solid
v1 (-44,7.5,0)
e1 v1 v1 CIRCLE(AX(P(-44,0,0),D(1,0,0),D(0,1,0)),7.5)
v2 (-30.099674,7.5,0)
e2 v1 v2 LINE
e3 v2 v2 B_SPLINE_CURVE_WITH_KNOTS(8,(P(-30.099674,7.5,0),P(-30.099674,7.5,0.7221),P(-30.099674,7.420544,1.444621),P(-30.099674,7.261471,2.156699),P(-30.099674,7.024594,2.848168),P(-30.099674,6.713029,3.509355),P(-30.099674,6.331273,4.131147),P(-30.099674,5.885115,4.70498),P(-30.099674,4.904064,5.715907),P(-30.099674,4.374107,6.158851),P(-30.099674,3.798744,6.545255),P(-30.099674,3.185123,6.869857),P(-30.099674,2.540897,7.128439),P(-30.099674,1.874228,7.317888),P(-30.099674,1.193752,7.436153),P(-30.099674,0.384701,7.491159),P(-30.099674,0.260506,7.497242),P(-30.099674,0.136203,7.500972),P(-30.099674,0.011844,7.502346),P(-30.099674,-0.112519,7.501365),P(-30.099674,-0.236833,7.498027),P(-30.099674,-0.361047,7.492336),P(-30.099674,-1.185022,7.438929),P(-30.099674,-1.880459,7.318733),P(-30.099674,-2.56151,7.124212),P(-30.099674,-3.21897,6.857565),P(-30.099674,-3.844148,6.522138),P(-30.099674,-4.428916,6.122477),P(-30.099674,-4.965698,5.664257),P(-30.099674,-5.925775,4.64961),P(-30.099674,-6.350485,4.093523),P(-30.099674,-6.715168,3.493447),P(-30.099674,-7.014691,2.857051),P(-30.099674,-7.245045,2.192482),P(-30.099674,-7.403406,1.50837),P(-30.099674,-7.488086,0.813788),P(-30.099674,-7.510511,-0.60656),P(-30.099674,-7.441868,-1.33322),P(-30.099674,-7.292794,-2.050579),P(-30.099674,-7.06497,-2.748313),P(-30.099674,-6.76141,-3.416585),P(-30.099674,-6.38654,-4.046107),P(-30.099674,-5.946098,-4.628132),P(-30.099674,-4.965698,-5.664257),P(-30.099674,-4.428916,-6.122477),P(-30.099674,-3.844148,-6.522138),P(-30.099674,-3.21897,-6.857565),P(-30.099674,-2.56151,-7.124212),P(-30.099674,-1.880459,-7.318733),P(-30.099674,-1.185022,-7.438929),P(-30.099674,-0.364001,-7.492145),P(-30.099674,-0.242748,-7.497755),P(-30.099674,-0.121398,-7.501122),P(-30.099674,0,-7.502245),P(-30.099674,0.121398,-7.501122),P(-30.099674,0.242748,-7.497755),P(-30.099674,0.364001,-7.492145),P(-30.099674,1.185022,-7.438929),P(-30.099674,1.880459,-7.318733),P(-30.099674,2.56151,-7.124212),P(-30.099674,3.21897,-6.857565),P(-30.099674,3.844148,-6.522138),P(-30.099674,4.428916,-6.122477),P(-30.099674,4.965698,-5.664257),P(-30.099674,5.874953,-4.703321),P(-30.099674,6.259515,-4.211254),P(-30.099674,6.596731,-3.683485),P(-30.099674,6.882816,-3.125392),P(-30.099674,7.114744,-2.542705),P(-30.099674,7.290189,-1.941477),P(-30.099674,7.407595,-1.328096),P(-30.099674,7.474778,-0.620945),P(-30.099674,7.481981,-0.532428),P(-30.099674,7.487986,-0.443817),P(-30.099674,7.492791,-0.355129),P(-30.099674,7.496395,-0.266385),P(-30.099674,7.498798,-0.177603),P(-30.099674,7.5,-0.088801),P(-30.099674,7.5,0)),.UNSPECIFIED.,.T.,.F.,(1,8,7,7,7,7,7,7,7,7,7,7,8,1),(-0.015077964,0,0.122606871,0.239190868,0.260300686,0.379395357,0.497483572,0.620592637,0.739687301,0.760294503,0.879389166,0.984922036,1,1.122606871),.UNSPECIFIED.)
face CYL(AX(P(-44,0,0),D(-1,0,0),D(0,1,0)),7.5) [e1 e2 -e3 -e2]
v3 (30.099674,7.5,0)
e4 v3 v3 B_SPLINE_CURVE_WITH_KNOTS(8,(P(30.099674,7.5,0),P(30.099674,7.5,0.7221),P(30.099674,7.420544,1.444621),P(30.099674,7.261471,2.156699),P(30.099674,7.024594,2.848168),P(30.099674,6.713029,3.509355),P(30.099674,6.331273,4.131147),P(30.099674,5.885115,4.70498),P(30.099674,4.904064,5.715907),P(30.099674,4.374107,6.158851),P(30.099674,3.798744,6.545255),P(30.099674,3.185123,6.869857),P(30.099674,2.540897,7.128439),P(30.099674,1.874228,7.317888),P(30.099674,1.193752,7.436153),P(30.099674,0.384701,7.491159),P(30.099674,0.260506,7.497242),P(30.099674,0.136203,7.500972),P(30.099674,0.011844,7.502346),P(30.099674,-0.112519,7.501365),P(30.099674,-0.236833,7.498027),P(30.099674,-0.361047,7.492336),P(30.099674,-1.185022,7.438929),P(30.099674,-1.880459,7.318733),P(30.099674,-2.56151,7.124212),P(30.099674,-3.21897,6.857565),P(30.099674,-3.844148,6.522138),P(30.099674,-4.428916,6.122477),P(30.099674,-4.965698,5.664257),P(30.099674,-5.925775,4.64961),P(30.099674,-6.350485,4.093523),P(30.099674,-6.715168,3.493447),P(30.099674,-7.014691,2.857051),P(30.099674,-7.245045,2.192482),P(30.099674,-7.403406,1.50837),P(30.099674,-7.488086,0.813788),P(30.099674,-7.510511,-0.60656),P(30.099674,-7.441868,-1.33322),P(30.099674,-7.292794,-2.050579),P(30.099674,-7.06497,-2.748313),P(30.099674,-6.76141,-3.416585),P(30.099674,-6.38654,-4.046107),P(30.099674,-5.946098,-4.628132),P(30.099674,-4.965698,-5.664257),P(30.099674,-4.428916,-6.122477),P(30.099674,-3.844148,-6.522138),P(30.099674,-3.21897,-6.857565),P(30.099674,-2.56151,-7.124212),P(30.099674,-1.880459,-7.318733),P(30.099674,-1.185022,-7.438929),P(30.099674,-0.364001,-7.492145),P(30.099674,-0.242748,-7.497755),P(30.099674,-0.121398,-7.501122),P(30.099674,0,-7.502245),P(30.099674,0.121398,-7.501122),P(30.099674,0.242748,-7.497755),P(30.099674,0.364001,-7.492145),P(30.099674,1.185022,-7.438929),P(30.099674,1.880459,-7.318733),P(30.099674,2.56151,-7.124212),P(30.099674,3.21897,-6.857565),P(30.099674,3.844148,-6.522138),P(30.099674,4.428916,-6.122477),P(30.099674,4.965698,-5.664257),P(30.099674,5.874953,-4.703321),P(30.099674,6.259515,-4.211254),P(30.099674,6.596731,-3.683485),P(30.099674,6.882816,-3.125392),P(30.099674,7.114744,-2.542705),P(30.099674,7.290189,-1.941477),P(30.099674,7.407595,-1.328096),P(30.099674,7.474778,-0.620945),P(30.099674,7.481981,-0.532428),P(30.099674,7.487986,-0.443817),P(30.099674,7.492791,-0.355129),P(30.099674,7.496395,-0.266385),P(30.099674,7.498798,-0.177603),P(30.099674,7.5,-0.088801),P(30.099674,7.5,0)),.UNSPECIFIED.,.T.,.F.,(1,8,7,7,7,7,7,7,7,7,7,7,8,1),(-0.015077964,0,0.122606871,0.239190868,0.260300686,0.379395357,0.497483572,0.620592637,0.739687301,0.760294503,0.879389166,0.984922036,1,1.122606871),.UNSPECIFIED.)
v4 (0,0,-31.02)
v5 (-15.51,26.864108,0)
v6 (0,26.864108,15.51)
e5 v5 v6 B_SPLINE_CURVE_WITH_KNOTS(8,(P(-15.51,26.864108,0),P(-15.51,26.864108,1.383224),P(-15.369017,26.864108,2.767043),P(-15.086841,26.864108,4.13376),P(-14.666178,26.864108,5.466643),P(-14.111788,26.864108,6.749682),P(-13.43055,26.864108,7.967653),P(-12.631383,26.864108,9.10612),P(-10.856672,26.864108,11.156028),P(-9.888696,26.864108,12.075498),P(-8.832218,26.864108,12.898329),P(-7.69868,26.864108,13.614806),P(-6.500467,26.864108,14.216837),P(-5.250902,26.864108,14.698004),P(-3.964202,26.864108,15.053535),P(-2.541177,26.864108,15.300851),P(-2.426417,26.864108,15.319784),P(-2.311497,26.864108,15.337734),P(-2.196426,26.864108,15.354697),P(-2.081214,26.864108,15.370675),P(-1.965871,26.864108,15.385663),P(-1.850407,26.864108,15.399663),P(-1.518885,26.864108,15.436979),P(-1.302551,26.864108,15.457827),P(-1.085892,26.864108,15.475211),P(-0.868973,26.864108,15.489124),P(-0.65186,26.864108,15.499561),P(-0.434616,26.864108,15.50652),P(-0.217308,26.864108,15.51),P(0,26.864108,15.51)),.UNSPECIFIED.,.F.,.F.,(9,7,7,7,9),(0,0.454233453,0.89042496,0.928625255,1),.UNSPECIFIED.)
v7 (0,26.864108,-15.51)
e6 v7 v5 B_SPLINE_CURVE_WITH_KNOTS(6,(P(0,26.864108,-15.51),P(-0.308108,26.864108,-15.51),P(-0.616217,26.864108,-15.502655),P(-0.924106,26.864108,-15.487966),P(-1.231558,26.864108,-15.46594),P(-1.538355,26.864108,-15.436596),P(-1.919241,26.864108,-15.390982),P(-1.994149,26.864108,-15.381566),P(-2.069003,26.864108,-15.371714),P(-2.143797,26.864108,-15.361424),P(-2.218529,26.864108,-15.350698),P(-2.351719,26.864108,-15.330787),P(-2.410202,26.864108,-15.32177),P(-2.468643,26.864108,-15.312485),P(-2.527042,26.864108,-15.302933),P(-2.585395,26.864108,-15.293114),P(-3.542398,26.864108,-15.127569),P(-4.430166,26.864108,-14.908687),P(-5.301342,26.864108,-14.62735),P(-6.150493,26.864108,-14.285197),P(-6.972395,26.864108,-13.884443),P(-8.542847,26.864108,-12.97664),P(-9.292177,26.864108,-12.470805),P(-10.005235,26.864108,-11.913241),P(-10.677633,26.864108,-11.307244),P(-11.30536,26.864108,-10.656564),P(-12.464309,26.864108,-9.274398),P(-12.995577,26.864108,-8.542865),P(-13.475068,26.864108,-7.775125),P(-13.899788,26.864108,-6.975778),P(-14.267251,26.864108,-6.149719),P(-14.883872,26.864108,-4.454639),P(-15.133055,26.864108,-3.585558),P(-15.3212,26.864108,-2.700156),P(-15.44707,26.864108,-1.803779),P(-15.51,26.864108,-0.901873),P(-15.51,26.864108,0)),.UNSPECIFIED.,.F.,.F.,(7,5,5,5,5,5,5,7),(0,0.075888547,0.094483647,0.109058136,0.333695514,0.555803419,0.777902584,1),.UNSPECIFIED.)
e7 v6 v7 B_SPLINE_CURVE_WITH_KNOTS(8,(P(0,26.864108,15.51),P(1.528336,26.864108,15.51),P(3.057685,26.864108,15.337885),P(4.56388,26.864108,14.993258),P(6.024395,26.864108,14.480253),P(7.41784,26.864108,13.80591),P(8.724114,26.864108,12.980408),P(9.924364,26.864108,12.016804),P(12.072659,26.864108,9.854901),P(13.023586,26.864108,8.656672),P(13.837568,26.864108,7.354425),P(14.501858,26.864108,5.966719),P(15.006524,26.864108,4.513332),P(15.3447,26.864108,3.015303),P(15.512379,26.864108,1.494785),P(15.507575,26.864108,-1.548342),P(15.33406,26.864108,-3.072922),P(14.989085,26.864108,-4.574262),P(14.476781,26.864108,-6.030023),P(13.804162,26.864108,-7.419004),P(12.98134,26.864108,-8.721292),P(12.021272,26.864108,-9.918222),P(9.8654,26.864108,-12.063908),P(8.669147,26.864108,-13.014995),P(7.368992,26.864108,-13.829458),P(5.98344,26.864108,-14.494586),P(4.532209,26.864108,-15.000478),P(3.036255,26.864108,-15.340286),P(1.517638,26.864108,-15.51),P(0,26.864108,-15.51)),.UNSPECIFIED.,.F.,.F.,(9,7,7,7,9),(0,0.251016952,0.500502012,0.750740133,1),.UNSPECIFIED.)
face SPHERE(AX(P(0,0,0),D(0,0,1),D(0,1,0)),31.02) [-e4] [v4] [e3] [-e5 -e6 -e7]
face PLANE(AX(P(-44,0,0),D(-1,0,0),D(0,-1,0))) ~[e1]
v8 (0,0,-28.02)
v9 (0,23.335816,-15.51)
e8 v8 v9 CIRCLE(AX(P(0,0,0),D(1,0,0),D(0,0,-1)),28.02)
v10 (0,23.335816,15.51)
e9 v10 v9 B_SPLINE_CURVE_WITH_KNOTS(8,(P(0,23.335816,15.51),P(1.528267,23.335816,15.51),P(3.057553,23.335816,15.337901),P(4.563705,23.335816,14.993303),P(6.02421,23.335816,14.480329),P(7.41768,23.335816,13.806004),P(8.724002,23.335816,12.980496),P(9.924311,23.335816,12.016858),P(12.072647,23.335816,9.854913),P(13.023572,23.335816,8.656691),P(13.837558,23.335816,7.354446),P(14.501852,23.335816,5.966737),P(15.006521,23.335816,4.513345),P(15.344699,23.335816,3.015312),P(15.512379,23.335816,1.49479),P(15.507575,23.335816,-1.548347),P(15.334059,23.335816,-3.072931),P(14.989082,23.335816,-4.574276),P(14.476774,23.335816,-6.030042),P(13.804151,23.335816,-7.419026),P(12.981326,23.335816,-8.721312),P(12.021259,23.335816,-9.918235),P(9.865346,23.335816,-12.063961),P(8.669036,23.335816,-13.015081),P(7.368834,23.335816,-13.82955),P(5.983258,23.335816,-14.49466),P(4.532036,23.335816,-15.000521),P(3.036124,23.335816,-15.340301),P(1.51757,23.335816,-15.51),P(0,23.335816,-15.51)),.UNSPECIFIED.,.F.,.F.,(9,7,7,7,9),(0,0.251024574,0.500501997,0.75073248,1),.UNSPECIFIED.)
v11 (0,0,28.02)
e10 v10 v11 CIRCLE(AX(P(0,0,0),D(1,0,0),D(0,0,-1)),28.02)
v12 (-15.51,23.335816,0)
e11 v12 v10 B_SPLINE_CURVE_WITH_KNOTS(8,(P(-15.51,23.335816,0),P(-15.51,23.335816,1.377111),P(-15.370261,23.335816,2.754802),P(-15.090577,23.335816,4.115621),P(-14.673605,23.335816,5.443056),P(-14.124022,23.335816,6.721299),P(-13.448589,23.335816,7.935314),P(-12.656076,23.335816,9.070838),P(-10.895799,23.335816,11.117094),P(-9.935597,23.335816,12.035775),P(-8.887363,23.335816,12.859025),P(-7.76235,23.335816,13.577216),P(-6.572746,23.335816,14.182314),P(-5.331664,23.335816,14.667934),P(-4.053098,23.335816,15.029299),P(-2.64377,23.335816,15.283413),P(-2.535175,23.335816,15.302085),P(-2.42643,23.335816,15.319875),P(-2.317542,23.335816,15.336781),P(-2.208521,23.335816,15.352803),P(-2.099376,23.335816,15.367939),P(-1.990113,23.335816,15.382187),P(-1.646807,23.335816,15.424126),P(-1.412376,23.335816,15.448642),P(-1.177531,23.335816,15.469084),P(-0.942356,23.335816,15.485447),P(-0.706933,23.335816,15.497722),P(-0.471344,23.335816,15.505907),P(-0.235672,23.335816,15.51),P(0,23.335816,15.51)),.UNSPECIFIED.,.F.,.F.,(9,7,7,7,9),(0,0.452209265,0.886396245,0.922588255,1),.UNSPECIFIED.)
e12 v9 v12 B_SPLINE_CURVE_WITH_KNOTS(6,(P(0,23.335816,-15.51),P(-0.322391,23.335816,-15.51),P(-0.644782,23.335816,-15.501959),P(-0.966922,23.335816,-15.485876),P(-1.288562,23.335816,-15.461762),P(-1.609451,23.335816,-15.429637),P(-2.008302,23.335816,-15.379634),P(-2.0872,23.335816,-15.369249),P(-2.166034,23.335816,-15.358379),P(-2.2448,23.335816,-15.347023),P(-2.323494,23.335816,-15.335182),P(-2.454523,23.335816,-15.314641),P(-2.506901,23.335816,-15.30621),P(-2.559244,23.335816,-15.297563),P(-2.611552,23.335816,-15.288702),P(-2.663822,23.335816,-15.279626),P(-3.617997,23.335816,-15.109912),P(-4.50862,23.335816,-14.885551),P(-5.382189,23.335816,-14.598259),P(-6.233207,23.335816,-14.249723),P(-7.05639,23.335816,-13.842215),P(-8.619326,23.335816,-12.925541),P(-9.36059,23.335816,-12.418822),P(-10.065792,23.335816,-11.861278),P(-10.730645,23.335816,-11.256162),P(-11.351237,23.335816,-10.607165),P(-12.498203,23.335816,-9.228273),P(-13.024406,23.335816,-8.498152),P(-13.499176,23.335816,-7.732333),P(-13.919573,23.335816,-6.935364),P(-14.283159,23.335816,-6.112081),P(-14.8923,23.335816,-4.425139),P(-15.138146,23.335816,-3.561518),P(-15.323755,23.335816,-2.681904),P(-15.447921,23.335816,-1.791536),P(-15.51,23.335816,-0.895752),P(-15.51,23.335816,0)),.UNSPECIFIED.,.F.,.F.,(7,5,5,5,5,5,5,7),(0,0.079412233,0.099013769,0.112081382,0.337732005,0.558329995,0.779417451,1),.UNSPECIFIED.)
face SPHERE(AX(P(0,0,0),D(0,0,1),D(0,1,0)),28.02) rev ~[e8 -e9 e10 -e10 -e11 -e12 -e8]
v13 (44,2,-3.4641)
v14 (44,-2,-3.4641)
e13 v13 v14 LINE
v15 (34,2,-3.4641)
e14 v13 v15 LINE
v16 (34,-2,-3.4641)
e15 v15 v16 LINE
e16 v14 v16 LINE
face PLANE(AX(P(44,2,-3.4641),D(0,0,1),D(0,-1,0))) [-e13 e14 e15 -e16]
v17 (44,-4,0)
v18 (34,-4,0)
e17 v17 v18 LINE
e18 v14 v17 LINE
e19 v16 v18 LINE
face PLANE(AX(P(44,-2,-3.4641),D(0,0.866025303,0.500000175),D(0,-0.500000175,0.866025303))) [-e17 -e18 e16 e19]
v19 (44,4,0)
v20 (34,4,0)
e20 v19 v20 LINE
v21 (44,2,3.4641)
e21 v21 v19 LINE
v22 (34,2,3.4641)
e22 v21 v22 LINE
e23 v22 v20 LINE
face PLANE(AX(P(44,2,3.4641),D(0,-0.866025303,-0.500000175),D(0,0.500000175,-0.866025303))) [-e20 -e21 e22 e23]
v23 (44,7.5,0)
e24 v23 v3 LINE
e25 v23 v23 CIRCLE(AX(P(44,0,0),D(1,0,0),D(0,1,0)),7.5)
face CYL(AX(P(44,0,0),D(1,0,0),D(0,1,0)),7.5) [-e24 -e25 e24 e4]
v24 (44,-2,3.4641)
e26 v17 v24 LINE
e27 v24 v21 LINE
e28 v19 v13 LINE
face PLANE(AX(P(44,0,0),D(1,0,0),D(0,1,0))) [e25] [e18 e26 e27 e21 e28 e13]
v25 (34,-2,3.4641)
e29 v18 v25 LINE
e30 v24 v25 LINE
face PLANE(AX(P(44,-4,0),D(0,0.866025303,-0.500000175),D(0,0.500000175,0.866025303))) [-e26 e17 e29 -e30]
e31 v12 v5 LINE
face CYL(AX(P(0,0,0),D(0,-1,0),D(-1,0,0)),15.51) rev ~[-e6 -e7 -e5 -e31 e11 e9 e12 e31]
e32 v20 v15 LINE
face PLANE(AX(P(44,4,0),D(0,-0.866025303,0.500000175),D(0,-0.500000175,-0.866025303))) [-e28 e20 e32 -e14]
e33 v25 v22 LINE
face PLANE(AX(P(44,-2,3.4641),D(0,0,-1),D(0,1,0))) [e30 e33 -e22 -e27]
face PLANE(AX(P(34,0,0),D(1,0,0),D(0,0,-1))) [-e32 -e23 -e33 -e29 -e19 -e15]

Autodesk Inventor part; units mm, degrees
ref_plane "XZ Plane" through (0, 0, 0) normal (0, 1, 0) x (-1, 0, 0)
ref_plane "XY Plane" through (0, 0, 0) normal (0, 0, 1) x (1, 0, 0)
sketch "Sketch8" plane through (0, 0, 0) normal (1, 0, 0) x (0, 1, 0)
  arc A0 (0, -31.02) -> (0, 31.02) centre (0, 0) ccw
  line L0 (0, 31.02) -> (0, -31.02)
  line L1 (0, -49.5025) -> (0, 42.4391) construction
  dimension "radio" = 31.02
revolve "Revolution2" add sketch "Sketch8" angle 360 about axis through (0, 0, -49.5025) along (0, 0, 1)
sketch "Sketch15" plane through (0, 0, 0) normal (0, 1, 0) x (-1, 0, 0)
  circle A0 centre (0, 0) radius 15.51
  dimension "d35" = 31.02
extrude "Extrusion9" cut sketch "Sketch15" along normal up to surface
shell "Shell5" thickness 3 removed faces 2 at (0, 8.9547, 15.51) at (-6.3263, 0, 3.7266)
ref_plane "Work Plane6" through (44, 0, 0) normal (1, 0, 0) x (0, 1, 0)
sketch "Sketch13" plane through (44, 0, 0) normal (1, 0, 0) x (0, 1, 0)
  circle A0 centre (0, 0) radius 7.5
  dimension "d32" = 15
extrude "Extrusion8" add sketch "Sketch13" against normal up to next
mirror "Mirror1" about plane through (0, 0, 0) normal (1, 0, 0) of "Extrusion8"
sketch "Sketch16" plane through (44, 0, 0) normal (1, 0, 0) x (0, 0, -1)
  circle A0 centre (0, 0) radius 7.5 projected
  circle A1 centre (0, 0) radius 4 construction
  line L0 (0, 4) -> (3.4641, 2)
  line L1 (3.4641, 2) -> (3.4641, -2)
  line L2 (3.4641, -2) -> (0, -4)
  line L3 (0, -4) -> (-3.4641, -2)
  line L4 (-3.4641, -2) -> (-3.4641, 2)
  line L5 (-3.4641, 2) -> (0, 4)
  dimension "d40" = 3.5
extrude "Extrusion10" cut sketch "Sketch16" against normal blind 10 contours L0 L1 L2 L3 L4 L5
equation "\"d35\" = radio"
properties part number "Dosificador" material "ABS Plastic"
